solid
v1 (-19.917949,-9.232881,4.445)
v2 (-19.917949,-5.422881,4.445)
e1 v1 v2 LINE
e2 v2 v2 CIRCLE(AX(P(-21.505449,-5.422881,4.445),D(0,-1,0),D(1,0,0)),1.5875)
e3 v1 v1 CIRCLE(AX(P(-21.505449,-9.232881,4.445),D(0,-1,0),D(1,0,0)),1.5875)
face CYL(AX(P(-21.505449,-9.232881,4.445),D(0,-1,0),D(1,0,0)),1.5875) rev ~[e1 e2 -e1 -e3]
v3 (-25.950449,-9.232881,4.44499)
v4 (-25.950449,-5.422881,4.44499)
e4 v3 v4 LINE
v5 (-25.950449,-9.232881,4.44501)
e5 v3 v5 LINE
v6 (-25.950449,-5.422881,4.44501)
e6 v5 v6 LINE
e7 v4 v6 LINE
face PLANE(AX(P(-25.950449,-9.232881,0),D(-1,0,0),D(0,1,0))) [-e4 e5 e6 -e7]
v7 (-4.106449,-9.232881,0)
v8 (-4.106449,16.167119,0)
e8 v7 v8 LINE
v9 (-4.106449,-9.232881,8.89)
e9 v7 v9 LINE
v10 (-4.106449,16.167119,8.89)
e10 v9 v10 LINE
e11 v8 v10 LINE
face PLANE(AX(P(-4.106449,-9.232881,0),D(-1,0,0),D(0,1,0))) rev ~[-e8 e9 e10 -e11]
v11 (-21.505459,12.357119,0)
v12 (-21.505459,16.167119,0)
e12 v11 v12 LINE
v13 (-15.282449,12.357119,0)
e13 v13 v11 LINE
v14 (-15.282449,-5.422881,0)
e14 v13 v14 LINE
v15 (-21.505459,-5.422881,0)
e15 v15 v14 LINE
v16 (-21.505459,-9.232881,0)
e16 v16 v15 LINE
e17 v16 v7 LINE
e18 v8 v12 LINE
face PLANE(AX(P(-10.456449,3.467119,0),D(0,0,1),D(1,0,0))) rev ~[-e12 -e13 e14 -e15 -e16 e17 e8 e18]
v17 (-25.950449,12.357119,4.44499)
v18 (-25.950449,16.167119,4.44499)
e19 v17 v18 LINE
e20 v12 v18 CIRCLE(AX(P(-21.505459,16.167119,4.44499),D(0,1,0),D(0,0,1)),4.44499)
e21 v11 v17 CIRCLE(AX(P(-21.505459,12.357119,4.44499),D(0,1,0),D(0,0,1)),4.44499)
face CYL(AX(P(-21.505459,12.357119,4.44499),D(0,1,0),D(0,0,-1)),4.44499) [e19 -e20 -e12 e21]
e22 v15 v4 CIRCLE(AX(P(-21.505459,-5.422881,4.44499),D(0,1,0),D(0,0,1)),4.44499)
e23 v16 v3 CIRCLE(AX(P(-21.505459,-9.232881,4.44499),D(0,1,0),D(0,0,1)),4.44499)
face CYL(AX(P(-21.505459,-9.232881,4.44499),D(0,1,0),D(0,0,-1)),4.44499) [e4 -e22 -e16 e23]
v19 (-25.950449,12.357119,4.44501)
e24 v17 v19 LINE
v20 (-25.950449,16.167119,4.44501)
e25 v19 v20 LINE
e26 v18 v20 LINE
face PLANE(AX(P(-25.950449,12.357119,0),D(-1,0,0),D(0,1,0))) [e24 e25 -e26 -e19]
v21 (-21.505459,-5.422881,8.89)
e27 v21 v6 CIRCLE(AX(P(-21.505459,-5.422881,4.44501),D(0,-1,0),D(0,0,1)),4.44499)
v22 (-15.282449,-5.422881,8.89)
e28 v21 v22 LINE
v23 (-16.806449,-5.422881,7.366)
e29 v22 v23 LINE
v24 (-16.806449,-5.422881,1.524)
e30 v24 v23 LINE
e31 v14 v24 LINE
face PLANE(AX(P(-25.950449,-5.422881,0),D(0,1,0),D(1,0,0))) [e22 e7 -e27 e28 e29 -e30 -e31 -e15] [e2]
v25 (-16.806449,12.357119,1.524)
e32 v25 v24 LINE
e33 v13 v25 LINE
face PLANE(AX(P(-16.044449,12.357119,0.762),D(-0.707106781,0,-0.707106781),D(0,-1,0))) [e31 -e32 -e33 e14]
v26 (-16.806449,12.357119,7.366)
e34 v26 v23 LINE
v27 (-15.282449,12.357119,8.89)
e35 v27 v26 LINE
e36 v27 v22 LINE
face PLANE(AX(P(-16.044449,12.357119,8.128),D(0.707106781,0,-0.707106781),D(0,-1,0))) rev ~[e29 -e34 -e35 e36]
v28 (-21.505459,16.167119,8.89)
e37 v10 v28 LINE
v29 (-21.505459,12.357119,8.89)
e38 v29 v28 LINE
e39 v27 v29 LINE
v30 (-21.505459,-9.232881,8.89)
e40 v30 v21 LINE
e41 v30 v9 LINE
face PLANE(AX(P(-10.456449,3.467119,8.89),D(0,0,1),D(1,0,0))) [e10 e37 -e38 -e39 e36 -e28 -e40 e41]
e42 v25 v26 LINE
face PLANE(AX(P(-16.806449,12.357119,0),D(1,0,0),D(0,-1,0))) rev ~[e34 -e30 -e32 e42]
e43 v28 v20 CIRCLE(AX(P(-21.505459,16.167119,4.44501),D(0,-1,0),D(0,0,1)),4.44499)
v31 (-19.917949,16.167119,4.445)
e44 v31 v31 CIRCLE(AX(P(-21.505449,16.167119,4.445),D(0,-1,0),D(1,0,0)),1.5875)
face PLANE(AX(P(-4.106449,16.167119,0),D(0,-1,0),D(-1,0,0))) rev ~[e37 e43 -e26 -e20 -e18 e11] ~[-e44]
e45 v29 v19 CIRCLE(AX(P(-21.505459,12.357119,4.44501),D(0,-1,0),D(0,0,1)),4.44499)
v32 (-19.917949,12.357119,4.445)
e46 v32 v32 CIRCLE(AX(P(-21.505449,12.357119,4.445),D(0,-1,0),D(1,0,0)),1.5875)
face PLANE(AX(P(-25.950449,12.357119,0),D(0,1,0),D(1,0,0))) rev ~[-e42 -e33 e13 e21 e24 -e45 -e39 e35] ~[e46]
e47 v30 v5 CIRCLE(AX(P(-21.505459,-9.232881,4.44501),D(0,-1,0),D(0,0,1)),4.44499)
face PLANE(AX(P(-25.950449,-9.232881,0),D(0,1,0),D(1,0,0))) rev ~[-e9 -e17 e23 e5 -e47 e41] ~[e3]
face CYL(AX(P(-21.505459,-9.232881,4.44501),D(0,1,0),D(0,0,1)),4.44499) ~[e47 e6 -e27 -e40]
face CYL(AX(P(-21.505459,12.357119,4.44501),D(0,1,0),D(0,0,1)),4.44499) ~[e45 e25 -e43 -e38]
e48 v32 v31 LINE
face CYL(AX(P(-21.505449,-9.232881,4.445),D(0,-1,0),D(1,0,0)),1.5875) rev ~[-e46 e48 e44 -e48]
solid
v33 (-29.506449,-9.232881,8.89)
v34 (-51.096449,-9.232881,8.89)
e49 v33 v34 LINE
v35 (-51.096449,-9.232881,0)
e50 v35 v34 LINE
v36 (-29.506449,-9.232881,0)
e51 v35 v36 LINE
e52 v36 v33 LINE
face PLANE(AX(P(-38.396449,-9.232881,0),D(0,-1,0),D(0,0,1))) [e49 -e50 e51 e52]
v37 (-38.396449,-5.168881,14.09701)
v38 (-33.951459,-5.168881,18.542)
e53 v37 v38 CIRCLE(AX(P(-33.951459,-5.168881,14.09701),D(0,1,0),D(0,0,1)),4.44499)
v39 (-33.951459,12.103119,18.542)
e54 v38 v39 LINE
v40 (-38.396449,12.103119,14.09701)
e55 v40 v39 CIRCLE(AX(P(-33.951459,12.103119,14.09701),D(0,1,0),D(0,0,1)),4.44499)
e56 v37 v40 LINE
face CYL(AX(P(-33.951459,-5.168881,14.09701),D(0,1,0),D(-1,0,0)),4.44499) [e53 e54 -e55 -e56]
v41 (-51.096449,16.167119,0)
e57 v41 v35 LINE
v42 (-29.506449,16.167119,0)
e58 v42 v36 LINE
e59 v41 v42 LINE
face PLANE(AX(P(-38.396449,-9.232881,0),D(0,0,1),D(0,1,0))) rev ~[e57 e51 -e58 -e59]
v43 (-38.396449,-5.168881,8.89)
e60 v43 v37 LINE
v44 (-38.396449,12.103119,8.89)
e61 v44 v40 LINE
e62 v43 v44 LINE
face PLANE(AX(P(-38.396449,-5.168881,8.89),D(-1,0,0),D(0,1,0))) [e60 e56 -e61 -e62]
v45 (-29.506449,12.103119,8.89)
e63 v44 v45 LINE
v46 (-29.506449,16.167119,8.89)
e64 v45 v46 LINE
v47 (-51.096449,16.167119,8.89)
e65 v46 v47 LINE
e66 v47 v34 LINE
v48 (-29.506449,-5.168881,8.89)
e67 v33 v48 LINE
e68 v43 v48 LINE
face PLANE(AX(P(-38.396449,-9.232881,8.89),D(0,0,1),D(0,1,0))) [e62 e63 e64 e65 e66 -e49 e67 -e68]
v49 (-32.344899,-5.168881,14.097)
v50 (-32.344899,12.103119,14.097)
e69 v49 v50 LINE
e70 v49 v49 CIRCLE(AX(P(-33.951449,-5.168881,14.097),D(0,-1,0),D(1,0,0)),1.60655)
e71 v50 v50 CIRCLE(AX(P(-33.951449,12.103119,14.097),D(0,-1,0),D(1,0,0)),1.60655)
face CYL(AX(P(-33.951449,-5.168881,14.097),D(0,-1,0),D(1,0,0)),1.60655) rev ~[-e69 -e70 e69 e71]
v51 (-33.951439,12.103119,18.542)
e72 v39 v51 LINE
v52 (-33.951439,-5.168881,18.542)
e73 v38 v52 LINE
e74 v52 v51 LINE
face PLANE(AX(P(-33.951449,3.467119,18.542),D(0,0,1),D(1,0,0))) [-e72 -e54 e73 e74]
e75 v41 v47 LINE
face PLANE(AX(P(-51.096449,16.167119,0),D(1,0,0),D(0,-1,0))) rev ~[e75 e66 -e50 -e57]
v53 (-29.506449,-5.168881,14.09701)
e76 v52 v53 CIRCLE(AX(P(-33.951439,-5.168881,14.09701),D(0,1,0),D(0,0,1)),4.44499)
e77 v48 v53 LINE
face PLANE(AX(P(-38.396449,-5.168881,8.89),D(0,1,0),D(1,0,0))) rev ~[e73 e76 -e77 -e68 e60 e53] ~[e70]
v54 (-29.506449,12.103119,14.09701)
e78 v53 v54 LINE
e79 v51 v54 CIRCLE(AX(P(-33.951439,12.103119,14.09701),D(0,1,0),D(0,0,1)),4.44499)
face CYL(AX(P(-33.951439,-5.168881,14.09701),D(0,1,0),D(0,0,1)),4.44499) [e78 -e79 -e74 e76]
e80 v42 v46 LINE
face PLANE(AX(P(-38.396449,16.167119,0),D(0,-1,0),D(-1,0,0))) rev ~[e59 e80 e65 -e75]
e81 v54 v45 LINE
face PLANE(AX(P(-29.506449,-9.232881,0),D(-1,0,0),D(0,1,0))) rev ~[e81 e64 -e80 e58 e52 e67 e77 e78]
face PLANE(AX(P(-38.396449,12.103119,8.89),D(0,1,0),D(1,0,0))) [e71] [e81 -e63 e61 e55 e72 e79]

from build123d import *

# Parameters (mm, degrees)
F0_W      = 9.144
F0_H      = 3.81
F1_DEPTH  = 8.89
F3_DEPTH  = 8.89
F4_W      = 8.89
F4_H      = 17.272
F5_DEPTH  = 9.652
F6_R      = 1.60655
F7_DEPTH  = 25.4
F8_R      = 1.5875
F9_DEPTH  = 25.4
F10_R     = 4.44499
F10_2_R   = 4.44499
F11_SIZE  = 1.524
F12_DEPTH = 8.89


# Not quite as in the source:
# - a fillet or chamfer is up to 0.001 mm smaller than in the source, because OpenCascade refuses the exact size


with BuildPart() as f1:
    # F0 (on Top) → F1 (new body)
    with BuildSketch(Plane.XY):
        Polygon((-4.1064491987, 16.167118521), (-16.8064491987, 16.167118521), (-16.8064491987, 12.357118521), (-16.8064491987, -5.422881479), (-16.8064491987, -9.232881479), (-4.1064491987, -9.232881479), align=None)
        with Locations((-21.3784491987, 14.262118521)):
            Rectangle(F0_W, F0_H)
        with Locations((-21.3784491987, -7.327881479)):
            Rectangle(F0_W, F0_H)
    extrude(amount=F1_DEPTH)

    # F8 (on face) → F9 (cut)
    with BuildSketch(Plane.XZ.offset(9.232881479)):
        with Locations((-21.5054491987, 4.445)):
            Circle(F8_R)
    extrude(amount=-F9_DEPTH, mode=Mode.SUBTRACT)

    # F10#2 (radius 4.445 in the source; OpenCascade refuses exactly that, so slightly less here)
    f10_2_edges = [f1.edges().sort_by_distance(p)[0] for p in [
        (-25.950449, -7.327881, 8.89),
        (-25.950449, -7.327881, 0),
        (-25.950449, 14.262119, 0),
        (-25.950449, 14.262119, 8.89),
    ]]
    fillet(f10_2_edges, radius=F10_2_R)

    # F11
    f11_edges = [f1.edges().sort_by_distance(p)[0] for p in [
        (-16.806449, 3.467119, 8.89),
        (-16.806449, 3.467119, 0),
    ]]
    chamfer(f11_edges, length=F11_SIZE)


with BuildPart() as f3:
    # F2 (on Top) → F3 (new body)
    with BuildSketch(Plane.XY):
        Polygon((-38.3964491987, 12.103118521), (-38.3964491987, 16.167118521), (-51.0964491987, 16.167118521), (-51.0964491987, -9.232881479), (-38.3964491987, -9.232881479), (-38.3964491987, -5.168881479), (-29.5064491987, -5.168881479), (-29.5064491987, 12.103118521), align=None)
    extrude(amount=F3_DEPTH)

    # F4 (on face) → F5 (join)
    with BuildSketch(Plane.XY.offset(8.89)):
        with Locations((-33.9514491987, 3.467118521)):
            Rectangle(F4_W, F4_H)
    extrude(amount=F5_DEPTH)

    # F6 (on face) → F7 (cut)
    with BuildSketch(Plane.XZ.offset(5.168881479)):
        with Locations((-33.9514491987, 14.097)):
            Circle(F6_R)
    extrude(amount=-F7_DEPTH, mode=Mode.SUBTRACT)

    # F10 (radius 4.445 in the source; OpenCascade refuses exactly that, so slightly less here)
    f10_edges = [f3.edges().sort_by_distance(p)[0] for p in [
        (-29.506449, 3.467119, 18.542),
        (-38.396449, 3.467119, 18.542),
    ]]
    fillet(f10_edges, radius=F10_R)

    # F12 (add, through all): faces of the model
    f12_faces = [f3.faces().sort_by_distance(p)[0] for p in [
        (-38.3964491987, -7.200881479, 4.445),
        (-38.3964491987, 14.135118521, 4.445),
    ]]
    extrude(f12_faces, amount=F12_DEPTH)


solid = Compound([f1.part, f3.part])
